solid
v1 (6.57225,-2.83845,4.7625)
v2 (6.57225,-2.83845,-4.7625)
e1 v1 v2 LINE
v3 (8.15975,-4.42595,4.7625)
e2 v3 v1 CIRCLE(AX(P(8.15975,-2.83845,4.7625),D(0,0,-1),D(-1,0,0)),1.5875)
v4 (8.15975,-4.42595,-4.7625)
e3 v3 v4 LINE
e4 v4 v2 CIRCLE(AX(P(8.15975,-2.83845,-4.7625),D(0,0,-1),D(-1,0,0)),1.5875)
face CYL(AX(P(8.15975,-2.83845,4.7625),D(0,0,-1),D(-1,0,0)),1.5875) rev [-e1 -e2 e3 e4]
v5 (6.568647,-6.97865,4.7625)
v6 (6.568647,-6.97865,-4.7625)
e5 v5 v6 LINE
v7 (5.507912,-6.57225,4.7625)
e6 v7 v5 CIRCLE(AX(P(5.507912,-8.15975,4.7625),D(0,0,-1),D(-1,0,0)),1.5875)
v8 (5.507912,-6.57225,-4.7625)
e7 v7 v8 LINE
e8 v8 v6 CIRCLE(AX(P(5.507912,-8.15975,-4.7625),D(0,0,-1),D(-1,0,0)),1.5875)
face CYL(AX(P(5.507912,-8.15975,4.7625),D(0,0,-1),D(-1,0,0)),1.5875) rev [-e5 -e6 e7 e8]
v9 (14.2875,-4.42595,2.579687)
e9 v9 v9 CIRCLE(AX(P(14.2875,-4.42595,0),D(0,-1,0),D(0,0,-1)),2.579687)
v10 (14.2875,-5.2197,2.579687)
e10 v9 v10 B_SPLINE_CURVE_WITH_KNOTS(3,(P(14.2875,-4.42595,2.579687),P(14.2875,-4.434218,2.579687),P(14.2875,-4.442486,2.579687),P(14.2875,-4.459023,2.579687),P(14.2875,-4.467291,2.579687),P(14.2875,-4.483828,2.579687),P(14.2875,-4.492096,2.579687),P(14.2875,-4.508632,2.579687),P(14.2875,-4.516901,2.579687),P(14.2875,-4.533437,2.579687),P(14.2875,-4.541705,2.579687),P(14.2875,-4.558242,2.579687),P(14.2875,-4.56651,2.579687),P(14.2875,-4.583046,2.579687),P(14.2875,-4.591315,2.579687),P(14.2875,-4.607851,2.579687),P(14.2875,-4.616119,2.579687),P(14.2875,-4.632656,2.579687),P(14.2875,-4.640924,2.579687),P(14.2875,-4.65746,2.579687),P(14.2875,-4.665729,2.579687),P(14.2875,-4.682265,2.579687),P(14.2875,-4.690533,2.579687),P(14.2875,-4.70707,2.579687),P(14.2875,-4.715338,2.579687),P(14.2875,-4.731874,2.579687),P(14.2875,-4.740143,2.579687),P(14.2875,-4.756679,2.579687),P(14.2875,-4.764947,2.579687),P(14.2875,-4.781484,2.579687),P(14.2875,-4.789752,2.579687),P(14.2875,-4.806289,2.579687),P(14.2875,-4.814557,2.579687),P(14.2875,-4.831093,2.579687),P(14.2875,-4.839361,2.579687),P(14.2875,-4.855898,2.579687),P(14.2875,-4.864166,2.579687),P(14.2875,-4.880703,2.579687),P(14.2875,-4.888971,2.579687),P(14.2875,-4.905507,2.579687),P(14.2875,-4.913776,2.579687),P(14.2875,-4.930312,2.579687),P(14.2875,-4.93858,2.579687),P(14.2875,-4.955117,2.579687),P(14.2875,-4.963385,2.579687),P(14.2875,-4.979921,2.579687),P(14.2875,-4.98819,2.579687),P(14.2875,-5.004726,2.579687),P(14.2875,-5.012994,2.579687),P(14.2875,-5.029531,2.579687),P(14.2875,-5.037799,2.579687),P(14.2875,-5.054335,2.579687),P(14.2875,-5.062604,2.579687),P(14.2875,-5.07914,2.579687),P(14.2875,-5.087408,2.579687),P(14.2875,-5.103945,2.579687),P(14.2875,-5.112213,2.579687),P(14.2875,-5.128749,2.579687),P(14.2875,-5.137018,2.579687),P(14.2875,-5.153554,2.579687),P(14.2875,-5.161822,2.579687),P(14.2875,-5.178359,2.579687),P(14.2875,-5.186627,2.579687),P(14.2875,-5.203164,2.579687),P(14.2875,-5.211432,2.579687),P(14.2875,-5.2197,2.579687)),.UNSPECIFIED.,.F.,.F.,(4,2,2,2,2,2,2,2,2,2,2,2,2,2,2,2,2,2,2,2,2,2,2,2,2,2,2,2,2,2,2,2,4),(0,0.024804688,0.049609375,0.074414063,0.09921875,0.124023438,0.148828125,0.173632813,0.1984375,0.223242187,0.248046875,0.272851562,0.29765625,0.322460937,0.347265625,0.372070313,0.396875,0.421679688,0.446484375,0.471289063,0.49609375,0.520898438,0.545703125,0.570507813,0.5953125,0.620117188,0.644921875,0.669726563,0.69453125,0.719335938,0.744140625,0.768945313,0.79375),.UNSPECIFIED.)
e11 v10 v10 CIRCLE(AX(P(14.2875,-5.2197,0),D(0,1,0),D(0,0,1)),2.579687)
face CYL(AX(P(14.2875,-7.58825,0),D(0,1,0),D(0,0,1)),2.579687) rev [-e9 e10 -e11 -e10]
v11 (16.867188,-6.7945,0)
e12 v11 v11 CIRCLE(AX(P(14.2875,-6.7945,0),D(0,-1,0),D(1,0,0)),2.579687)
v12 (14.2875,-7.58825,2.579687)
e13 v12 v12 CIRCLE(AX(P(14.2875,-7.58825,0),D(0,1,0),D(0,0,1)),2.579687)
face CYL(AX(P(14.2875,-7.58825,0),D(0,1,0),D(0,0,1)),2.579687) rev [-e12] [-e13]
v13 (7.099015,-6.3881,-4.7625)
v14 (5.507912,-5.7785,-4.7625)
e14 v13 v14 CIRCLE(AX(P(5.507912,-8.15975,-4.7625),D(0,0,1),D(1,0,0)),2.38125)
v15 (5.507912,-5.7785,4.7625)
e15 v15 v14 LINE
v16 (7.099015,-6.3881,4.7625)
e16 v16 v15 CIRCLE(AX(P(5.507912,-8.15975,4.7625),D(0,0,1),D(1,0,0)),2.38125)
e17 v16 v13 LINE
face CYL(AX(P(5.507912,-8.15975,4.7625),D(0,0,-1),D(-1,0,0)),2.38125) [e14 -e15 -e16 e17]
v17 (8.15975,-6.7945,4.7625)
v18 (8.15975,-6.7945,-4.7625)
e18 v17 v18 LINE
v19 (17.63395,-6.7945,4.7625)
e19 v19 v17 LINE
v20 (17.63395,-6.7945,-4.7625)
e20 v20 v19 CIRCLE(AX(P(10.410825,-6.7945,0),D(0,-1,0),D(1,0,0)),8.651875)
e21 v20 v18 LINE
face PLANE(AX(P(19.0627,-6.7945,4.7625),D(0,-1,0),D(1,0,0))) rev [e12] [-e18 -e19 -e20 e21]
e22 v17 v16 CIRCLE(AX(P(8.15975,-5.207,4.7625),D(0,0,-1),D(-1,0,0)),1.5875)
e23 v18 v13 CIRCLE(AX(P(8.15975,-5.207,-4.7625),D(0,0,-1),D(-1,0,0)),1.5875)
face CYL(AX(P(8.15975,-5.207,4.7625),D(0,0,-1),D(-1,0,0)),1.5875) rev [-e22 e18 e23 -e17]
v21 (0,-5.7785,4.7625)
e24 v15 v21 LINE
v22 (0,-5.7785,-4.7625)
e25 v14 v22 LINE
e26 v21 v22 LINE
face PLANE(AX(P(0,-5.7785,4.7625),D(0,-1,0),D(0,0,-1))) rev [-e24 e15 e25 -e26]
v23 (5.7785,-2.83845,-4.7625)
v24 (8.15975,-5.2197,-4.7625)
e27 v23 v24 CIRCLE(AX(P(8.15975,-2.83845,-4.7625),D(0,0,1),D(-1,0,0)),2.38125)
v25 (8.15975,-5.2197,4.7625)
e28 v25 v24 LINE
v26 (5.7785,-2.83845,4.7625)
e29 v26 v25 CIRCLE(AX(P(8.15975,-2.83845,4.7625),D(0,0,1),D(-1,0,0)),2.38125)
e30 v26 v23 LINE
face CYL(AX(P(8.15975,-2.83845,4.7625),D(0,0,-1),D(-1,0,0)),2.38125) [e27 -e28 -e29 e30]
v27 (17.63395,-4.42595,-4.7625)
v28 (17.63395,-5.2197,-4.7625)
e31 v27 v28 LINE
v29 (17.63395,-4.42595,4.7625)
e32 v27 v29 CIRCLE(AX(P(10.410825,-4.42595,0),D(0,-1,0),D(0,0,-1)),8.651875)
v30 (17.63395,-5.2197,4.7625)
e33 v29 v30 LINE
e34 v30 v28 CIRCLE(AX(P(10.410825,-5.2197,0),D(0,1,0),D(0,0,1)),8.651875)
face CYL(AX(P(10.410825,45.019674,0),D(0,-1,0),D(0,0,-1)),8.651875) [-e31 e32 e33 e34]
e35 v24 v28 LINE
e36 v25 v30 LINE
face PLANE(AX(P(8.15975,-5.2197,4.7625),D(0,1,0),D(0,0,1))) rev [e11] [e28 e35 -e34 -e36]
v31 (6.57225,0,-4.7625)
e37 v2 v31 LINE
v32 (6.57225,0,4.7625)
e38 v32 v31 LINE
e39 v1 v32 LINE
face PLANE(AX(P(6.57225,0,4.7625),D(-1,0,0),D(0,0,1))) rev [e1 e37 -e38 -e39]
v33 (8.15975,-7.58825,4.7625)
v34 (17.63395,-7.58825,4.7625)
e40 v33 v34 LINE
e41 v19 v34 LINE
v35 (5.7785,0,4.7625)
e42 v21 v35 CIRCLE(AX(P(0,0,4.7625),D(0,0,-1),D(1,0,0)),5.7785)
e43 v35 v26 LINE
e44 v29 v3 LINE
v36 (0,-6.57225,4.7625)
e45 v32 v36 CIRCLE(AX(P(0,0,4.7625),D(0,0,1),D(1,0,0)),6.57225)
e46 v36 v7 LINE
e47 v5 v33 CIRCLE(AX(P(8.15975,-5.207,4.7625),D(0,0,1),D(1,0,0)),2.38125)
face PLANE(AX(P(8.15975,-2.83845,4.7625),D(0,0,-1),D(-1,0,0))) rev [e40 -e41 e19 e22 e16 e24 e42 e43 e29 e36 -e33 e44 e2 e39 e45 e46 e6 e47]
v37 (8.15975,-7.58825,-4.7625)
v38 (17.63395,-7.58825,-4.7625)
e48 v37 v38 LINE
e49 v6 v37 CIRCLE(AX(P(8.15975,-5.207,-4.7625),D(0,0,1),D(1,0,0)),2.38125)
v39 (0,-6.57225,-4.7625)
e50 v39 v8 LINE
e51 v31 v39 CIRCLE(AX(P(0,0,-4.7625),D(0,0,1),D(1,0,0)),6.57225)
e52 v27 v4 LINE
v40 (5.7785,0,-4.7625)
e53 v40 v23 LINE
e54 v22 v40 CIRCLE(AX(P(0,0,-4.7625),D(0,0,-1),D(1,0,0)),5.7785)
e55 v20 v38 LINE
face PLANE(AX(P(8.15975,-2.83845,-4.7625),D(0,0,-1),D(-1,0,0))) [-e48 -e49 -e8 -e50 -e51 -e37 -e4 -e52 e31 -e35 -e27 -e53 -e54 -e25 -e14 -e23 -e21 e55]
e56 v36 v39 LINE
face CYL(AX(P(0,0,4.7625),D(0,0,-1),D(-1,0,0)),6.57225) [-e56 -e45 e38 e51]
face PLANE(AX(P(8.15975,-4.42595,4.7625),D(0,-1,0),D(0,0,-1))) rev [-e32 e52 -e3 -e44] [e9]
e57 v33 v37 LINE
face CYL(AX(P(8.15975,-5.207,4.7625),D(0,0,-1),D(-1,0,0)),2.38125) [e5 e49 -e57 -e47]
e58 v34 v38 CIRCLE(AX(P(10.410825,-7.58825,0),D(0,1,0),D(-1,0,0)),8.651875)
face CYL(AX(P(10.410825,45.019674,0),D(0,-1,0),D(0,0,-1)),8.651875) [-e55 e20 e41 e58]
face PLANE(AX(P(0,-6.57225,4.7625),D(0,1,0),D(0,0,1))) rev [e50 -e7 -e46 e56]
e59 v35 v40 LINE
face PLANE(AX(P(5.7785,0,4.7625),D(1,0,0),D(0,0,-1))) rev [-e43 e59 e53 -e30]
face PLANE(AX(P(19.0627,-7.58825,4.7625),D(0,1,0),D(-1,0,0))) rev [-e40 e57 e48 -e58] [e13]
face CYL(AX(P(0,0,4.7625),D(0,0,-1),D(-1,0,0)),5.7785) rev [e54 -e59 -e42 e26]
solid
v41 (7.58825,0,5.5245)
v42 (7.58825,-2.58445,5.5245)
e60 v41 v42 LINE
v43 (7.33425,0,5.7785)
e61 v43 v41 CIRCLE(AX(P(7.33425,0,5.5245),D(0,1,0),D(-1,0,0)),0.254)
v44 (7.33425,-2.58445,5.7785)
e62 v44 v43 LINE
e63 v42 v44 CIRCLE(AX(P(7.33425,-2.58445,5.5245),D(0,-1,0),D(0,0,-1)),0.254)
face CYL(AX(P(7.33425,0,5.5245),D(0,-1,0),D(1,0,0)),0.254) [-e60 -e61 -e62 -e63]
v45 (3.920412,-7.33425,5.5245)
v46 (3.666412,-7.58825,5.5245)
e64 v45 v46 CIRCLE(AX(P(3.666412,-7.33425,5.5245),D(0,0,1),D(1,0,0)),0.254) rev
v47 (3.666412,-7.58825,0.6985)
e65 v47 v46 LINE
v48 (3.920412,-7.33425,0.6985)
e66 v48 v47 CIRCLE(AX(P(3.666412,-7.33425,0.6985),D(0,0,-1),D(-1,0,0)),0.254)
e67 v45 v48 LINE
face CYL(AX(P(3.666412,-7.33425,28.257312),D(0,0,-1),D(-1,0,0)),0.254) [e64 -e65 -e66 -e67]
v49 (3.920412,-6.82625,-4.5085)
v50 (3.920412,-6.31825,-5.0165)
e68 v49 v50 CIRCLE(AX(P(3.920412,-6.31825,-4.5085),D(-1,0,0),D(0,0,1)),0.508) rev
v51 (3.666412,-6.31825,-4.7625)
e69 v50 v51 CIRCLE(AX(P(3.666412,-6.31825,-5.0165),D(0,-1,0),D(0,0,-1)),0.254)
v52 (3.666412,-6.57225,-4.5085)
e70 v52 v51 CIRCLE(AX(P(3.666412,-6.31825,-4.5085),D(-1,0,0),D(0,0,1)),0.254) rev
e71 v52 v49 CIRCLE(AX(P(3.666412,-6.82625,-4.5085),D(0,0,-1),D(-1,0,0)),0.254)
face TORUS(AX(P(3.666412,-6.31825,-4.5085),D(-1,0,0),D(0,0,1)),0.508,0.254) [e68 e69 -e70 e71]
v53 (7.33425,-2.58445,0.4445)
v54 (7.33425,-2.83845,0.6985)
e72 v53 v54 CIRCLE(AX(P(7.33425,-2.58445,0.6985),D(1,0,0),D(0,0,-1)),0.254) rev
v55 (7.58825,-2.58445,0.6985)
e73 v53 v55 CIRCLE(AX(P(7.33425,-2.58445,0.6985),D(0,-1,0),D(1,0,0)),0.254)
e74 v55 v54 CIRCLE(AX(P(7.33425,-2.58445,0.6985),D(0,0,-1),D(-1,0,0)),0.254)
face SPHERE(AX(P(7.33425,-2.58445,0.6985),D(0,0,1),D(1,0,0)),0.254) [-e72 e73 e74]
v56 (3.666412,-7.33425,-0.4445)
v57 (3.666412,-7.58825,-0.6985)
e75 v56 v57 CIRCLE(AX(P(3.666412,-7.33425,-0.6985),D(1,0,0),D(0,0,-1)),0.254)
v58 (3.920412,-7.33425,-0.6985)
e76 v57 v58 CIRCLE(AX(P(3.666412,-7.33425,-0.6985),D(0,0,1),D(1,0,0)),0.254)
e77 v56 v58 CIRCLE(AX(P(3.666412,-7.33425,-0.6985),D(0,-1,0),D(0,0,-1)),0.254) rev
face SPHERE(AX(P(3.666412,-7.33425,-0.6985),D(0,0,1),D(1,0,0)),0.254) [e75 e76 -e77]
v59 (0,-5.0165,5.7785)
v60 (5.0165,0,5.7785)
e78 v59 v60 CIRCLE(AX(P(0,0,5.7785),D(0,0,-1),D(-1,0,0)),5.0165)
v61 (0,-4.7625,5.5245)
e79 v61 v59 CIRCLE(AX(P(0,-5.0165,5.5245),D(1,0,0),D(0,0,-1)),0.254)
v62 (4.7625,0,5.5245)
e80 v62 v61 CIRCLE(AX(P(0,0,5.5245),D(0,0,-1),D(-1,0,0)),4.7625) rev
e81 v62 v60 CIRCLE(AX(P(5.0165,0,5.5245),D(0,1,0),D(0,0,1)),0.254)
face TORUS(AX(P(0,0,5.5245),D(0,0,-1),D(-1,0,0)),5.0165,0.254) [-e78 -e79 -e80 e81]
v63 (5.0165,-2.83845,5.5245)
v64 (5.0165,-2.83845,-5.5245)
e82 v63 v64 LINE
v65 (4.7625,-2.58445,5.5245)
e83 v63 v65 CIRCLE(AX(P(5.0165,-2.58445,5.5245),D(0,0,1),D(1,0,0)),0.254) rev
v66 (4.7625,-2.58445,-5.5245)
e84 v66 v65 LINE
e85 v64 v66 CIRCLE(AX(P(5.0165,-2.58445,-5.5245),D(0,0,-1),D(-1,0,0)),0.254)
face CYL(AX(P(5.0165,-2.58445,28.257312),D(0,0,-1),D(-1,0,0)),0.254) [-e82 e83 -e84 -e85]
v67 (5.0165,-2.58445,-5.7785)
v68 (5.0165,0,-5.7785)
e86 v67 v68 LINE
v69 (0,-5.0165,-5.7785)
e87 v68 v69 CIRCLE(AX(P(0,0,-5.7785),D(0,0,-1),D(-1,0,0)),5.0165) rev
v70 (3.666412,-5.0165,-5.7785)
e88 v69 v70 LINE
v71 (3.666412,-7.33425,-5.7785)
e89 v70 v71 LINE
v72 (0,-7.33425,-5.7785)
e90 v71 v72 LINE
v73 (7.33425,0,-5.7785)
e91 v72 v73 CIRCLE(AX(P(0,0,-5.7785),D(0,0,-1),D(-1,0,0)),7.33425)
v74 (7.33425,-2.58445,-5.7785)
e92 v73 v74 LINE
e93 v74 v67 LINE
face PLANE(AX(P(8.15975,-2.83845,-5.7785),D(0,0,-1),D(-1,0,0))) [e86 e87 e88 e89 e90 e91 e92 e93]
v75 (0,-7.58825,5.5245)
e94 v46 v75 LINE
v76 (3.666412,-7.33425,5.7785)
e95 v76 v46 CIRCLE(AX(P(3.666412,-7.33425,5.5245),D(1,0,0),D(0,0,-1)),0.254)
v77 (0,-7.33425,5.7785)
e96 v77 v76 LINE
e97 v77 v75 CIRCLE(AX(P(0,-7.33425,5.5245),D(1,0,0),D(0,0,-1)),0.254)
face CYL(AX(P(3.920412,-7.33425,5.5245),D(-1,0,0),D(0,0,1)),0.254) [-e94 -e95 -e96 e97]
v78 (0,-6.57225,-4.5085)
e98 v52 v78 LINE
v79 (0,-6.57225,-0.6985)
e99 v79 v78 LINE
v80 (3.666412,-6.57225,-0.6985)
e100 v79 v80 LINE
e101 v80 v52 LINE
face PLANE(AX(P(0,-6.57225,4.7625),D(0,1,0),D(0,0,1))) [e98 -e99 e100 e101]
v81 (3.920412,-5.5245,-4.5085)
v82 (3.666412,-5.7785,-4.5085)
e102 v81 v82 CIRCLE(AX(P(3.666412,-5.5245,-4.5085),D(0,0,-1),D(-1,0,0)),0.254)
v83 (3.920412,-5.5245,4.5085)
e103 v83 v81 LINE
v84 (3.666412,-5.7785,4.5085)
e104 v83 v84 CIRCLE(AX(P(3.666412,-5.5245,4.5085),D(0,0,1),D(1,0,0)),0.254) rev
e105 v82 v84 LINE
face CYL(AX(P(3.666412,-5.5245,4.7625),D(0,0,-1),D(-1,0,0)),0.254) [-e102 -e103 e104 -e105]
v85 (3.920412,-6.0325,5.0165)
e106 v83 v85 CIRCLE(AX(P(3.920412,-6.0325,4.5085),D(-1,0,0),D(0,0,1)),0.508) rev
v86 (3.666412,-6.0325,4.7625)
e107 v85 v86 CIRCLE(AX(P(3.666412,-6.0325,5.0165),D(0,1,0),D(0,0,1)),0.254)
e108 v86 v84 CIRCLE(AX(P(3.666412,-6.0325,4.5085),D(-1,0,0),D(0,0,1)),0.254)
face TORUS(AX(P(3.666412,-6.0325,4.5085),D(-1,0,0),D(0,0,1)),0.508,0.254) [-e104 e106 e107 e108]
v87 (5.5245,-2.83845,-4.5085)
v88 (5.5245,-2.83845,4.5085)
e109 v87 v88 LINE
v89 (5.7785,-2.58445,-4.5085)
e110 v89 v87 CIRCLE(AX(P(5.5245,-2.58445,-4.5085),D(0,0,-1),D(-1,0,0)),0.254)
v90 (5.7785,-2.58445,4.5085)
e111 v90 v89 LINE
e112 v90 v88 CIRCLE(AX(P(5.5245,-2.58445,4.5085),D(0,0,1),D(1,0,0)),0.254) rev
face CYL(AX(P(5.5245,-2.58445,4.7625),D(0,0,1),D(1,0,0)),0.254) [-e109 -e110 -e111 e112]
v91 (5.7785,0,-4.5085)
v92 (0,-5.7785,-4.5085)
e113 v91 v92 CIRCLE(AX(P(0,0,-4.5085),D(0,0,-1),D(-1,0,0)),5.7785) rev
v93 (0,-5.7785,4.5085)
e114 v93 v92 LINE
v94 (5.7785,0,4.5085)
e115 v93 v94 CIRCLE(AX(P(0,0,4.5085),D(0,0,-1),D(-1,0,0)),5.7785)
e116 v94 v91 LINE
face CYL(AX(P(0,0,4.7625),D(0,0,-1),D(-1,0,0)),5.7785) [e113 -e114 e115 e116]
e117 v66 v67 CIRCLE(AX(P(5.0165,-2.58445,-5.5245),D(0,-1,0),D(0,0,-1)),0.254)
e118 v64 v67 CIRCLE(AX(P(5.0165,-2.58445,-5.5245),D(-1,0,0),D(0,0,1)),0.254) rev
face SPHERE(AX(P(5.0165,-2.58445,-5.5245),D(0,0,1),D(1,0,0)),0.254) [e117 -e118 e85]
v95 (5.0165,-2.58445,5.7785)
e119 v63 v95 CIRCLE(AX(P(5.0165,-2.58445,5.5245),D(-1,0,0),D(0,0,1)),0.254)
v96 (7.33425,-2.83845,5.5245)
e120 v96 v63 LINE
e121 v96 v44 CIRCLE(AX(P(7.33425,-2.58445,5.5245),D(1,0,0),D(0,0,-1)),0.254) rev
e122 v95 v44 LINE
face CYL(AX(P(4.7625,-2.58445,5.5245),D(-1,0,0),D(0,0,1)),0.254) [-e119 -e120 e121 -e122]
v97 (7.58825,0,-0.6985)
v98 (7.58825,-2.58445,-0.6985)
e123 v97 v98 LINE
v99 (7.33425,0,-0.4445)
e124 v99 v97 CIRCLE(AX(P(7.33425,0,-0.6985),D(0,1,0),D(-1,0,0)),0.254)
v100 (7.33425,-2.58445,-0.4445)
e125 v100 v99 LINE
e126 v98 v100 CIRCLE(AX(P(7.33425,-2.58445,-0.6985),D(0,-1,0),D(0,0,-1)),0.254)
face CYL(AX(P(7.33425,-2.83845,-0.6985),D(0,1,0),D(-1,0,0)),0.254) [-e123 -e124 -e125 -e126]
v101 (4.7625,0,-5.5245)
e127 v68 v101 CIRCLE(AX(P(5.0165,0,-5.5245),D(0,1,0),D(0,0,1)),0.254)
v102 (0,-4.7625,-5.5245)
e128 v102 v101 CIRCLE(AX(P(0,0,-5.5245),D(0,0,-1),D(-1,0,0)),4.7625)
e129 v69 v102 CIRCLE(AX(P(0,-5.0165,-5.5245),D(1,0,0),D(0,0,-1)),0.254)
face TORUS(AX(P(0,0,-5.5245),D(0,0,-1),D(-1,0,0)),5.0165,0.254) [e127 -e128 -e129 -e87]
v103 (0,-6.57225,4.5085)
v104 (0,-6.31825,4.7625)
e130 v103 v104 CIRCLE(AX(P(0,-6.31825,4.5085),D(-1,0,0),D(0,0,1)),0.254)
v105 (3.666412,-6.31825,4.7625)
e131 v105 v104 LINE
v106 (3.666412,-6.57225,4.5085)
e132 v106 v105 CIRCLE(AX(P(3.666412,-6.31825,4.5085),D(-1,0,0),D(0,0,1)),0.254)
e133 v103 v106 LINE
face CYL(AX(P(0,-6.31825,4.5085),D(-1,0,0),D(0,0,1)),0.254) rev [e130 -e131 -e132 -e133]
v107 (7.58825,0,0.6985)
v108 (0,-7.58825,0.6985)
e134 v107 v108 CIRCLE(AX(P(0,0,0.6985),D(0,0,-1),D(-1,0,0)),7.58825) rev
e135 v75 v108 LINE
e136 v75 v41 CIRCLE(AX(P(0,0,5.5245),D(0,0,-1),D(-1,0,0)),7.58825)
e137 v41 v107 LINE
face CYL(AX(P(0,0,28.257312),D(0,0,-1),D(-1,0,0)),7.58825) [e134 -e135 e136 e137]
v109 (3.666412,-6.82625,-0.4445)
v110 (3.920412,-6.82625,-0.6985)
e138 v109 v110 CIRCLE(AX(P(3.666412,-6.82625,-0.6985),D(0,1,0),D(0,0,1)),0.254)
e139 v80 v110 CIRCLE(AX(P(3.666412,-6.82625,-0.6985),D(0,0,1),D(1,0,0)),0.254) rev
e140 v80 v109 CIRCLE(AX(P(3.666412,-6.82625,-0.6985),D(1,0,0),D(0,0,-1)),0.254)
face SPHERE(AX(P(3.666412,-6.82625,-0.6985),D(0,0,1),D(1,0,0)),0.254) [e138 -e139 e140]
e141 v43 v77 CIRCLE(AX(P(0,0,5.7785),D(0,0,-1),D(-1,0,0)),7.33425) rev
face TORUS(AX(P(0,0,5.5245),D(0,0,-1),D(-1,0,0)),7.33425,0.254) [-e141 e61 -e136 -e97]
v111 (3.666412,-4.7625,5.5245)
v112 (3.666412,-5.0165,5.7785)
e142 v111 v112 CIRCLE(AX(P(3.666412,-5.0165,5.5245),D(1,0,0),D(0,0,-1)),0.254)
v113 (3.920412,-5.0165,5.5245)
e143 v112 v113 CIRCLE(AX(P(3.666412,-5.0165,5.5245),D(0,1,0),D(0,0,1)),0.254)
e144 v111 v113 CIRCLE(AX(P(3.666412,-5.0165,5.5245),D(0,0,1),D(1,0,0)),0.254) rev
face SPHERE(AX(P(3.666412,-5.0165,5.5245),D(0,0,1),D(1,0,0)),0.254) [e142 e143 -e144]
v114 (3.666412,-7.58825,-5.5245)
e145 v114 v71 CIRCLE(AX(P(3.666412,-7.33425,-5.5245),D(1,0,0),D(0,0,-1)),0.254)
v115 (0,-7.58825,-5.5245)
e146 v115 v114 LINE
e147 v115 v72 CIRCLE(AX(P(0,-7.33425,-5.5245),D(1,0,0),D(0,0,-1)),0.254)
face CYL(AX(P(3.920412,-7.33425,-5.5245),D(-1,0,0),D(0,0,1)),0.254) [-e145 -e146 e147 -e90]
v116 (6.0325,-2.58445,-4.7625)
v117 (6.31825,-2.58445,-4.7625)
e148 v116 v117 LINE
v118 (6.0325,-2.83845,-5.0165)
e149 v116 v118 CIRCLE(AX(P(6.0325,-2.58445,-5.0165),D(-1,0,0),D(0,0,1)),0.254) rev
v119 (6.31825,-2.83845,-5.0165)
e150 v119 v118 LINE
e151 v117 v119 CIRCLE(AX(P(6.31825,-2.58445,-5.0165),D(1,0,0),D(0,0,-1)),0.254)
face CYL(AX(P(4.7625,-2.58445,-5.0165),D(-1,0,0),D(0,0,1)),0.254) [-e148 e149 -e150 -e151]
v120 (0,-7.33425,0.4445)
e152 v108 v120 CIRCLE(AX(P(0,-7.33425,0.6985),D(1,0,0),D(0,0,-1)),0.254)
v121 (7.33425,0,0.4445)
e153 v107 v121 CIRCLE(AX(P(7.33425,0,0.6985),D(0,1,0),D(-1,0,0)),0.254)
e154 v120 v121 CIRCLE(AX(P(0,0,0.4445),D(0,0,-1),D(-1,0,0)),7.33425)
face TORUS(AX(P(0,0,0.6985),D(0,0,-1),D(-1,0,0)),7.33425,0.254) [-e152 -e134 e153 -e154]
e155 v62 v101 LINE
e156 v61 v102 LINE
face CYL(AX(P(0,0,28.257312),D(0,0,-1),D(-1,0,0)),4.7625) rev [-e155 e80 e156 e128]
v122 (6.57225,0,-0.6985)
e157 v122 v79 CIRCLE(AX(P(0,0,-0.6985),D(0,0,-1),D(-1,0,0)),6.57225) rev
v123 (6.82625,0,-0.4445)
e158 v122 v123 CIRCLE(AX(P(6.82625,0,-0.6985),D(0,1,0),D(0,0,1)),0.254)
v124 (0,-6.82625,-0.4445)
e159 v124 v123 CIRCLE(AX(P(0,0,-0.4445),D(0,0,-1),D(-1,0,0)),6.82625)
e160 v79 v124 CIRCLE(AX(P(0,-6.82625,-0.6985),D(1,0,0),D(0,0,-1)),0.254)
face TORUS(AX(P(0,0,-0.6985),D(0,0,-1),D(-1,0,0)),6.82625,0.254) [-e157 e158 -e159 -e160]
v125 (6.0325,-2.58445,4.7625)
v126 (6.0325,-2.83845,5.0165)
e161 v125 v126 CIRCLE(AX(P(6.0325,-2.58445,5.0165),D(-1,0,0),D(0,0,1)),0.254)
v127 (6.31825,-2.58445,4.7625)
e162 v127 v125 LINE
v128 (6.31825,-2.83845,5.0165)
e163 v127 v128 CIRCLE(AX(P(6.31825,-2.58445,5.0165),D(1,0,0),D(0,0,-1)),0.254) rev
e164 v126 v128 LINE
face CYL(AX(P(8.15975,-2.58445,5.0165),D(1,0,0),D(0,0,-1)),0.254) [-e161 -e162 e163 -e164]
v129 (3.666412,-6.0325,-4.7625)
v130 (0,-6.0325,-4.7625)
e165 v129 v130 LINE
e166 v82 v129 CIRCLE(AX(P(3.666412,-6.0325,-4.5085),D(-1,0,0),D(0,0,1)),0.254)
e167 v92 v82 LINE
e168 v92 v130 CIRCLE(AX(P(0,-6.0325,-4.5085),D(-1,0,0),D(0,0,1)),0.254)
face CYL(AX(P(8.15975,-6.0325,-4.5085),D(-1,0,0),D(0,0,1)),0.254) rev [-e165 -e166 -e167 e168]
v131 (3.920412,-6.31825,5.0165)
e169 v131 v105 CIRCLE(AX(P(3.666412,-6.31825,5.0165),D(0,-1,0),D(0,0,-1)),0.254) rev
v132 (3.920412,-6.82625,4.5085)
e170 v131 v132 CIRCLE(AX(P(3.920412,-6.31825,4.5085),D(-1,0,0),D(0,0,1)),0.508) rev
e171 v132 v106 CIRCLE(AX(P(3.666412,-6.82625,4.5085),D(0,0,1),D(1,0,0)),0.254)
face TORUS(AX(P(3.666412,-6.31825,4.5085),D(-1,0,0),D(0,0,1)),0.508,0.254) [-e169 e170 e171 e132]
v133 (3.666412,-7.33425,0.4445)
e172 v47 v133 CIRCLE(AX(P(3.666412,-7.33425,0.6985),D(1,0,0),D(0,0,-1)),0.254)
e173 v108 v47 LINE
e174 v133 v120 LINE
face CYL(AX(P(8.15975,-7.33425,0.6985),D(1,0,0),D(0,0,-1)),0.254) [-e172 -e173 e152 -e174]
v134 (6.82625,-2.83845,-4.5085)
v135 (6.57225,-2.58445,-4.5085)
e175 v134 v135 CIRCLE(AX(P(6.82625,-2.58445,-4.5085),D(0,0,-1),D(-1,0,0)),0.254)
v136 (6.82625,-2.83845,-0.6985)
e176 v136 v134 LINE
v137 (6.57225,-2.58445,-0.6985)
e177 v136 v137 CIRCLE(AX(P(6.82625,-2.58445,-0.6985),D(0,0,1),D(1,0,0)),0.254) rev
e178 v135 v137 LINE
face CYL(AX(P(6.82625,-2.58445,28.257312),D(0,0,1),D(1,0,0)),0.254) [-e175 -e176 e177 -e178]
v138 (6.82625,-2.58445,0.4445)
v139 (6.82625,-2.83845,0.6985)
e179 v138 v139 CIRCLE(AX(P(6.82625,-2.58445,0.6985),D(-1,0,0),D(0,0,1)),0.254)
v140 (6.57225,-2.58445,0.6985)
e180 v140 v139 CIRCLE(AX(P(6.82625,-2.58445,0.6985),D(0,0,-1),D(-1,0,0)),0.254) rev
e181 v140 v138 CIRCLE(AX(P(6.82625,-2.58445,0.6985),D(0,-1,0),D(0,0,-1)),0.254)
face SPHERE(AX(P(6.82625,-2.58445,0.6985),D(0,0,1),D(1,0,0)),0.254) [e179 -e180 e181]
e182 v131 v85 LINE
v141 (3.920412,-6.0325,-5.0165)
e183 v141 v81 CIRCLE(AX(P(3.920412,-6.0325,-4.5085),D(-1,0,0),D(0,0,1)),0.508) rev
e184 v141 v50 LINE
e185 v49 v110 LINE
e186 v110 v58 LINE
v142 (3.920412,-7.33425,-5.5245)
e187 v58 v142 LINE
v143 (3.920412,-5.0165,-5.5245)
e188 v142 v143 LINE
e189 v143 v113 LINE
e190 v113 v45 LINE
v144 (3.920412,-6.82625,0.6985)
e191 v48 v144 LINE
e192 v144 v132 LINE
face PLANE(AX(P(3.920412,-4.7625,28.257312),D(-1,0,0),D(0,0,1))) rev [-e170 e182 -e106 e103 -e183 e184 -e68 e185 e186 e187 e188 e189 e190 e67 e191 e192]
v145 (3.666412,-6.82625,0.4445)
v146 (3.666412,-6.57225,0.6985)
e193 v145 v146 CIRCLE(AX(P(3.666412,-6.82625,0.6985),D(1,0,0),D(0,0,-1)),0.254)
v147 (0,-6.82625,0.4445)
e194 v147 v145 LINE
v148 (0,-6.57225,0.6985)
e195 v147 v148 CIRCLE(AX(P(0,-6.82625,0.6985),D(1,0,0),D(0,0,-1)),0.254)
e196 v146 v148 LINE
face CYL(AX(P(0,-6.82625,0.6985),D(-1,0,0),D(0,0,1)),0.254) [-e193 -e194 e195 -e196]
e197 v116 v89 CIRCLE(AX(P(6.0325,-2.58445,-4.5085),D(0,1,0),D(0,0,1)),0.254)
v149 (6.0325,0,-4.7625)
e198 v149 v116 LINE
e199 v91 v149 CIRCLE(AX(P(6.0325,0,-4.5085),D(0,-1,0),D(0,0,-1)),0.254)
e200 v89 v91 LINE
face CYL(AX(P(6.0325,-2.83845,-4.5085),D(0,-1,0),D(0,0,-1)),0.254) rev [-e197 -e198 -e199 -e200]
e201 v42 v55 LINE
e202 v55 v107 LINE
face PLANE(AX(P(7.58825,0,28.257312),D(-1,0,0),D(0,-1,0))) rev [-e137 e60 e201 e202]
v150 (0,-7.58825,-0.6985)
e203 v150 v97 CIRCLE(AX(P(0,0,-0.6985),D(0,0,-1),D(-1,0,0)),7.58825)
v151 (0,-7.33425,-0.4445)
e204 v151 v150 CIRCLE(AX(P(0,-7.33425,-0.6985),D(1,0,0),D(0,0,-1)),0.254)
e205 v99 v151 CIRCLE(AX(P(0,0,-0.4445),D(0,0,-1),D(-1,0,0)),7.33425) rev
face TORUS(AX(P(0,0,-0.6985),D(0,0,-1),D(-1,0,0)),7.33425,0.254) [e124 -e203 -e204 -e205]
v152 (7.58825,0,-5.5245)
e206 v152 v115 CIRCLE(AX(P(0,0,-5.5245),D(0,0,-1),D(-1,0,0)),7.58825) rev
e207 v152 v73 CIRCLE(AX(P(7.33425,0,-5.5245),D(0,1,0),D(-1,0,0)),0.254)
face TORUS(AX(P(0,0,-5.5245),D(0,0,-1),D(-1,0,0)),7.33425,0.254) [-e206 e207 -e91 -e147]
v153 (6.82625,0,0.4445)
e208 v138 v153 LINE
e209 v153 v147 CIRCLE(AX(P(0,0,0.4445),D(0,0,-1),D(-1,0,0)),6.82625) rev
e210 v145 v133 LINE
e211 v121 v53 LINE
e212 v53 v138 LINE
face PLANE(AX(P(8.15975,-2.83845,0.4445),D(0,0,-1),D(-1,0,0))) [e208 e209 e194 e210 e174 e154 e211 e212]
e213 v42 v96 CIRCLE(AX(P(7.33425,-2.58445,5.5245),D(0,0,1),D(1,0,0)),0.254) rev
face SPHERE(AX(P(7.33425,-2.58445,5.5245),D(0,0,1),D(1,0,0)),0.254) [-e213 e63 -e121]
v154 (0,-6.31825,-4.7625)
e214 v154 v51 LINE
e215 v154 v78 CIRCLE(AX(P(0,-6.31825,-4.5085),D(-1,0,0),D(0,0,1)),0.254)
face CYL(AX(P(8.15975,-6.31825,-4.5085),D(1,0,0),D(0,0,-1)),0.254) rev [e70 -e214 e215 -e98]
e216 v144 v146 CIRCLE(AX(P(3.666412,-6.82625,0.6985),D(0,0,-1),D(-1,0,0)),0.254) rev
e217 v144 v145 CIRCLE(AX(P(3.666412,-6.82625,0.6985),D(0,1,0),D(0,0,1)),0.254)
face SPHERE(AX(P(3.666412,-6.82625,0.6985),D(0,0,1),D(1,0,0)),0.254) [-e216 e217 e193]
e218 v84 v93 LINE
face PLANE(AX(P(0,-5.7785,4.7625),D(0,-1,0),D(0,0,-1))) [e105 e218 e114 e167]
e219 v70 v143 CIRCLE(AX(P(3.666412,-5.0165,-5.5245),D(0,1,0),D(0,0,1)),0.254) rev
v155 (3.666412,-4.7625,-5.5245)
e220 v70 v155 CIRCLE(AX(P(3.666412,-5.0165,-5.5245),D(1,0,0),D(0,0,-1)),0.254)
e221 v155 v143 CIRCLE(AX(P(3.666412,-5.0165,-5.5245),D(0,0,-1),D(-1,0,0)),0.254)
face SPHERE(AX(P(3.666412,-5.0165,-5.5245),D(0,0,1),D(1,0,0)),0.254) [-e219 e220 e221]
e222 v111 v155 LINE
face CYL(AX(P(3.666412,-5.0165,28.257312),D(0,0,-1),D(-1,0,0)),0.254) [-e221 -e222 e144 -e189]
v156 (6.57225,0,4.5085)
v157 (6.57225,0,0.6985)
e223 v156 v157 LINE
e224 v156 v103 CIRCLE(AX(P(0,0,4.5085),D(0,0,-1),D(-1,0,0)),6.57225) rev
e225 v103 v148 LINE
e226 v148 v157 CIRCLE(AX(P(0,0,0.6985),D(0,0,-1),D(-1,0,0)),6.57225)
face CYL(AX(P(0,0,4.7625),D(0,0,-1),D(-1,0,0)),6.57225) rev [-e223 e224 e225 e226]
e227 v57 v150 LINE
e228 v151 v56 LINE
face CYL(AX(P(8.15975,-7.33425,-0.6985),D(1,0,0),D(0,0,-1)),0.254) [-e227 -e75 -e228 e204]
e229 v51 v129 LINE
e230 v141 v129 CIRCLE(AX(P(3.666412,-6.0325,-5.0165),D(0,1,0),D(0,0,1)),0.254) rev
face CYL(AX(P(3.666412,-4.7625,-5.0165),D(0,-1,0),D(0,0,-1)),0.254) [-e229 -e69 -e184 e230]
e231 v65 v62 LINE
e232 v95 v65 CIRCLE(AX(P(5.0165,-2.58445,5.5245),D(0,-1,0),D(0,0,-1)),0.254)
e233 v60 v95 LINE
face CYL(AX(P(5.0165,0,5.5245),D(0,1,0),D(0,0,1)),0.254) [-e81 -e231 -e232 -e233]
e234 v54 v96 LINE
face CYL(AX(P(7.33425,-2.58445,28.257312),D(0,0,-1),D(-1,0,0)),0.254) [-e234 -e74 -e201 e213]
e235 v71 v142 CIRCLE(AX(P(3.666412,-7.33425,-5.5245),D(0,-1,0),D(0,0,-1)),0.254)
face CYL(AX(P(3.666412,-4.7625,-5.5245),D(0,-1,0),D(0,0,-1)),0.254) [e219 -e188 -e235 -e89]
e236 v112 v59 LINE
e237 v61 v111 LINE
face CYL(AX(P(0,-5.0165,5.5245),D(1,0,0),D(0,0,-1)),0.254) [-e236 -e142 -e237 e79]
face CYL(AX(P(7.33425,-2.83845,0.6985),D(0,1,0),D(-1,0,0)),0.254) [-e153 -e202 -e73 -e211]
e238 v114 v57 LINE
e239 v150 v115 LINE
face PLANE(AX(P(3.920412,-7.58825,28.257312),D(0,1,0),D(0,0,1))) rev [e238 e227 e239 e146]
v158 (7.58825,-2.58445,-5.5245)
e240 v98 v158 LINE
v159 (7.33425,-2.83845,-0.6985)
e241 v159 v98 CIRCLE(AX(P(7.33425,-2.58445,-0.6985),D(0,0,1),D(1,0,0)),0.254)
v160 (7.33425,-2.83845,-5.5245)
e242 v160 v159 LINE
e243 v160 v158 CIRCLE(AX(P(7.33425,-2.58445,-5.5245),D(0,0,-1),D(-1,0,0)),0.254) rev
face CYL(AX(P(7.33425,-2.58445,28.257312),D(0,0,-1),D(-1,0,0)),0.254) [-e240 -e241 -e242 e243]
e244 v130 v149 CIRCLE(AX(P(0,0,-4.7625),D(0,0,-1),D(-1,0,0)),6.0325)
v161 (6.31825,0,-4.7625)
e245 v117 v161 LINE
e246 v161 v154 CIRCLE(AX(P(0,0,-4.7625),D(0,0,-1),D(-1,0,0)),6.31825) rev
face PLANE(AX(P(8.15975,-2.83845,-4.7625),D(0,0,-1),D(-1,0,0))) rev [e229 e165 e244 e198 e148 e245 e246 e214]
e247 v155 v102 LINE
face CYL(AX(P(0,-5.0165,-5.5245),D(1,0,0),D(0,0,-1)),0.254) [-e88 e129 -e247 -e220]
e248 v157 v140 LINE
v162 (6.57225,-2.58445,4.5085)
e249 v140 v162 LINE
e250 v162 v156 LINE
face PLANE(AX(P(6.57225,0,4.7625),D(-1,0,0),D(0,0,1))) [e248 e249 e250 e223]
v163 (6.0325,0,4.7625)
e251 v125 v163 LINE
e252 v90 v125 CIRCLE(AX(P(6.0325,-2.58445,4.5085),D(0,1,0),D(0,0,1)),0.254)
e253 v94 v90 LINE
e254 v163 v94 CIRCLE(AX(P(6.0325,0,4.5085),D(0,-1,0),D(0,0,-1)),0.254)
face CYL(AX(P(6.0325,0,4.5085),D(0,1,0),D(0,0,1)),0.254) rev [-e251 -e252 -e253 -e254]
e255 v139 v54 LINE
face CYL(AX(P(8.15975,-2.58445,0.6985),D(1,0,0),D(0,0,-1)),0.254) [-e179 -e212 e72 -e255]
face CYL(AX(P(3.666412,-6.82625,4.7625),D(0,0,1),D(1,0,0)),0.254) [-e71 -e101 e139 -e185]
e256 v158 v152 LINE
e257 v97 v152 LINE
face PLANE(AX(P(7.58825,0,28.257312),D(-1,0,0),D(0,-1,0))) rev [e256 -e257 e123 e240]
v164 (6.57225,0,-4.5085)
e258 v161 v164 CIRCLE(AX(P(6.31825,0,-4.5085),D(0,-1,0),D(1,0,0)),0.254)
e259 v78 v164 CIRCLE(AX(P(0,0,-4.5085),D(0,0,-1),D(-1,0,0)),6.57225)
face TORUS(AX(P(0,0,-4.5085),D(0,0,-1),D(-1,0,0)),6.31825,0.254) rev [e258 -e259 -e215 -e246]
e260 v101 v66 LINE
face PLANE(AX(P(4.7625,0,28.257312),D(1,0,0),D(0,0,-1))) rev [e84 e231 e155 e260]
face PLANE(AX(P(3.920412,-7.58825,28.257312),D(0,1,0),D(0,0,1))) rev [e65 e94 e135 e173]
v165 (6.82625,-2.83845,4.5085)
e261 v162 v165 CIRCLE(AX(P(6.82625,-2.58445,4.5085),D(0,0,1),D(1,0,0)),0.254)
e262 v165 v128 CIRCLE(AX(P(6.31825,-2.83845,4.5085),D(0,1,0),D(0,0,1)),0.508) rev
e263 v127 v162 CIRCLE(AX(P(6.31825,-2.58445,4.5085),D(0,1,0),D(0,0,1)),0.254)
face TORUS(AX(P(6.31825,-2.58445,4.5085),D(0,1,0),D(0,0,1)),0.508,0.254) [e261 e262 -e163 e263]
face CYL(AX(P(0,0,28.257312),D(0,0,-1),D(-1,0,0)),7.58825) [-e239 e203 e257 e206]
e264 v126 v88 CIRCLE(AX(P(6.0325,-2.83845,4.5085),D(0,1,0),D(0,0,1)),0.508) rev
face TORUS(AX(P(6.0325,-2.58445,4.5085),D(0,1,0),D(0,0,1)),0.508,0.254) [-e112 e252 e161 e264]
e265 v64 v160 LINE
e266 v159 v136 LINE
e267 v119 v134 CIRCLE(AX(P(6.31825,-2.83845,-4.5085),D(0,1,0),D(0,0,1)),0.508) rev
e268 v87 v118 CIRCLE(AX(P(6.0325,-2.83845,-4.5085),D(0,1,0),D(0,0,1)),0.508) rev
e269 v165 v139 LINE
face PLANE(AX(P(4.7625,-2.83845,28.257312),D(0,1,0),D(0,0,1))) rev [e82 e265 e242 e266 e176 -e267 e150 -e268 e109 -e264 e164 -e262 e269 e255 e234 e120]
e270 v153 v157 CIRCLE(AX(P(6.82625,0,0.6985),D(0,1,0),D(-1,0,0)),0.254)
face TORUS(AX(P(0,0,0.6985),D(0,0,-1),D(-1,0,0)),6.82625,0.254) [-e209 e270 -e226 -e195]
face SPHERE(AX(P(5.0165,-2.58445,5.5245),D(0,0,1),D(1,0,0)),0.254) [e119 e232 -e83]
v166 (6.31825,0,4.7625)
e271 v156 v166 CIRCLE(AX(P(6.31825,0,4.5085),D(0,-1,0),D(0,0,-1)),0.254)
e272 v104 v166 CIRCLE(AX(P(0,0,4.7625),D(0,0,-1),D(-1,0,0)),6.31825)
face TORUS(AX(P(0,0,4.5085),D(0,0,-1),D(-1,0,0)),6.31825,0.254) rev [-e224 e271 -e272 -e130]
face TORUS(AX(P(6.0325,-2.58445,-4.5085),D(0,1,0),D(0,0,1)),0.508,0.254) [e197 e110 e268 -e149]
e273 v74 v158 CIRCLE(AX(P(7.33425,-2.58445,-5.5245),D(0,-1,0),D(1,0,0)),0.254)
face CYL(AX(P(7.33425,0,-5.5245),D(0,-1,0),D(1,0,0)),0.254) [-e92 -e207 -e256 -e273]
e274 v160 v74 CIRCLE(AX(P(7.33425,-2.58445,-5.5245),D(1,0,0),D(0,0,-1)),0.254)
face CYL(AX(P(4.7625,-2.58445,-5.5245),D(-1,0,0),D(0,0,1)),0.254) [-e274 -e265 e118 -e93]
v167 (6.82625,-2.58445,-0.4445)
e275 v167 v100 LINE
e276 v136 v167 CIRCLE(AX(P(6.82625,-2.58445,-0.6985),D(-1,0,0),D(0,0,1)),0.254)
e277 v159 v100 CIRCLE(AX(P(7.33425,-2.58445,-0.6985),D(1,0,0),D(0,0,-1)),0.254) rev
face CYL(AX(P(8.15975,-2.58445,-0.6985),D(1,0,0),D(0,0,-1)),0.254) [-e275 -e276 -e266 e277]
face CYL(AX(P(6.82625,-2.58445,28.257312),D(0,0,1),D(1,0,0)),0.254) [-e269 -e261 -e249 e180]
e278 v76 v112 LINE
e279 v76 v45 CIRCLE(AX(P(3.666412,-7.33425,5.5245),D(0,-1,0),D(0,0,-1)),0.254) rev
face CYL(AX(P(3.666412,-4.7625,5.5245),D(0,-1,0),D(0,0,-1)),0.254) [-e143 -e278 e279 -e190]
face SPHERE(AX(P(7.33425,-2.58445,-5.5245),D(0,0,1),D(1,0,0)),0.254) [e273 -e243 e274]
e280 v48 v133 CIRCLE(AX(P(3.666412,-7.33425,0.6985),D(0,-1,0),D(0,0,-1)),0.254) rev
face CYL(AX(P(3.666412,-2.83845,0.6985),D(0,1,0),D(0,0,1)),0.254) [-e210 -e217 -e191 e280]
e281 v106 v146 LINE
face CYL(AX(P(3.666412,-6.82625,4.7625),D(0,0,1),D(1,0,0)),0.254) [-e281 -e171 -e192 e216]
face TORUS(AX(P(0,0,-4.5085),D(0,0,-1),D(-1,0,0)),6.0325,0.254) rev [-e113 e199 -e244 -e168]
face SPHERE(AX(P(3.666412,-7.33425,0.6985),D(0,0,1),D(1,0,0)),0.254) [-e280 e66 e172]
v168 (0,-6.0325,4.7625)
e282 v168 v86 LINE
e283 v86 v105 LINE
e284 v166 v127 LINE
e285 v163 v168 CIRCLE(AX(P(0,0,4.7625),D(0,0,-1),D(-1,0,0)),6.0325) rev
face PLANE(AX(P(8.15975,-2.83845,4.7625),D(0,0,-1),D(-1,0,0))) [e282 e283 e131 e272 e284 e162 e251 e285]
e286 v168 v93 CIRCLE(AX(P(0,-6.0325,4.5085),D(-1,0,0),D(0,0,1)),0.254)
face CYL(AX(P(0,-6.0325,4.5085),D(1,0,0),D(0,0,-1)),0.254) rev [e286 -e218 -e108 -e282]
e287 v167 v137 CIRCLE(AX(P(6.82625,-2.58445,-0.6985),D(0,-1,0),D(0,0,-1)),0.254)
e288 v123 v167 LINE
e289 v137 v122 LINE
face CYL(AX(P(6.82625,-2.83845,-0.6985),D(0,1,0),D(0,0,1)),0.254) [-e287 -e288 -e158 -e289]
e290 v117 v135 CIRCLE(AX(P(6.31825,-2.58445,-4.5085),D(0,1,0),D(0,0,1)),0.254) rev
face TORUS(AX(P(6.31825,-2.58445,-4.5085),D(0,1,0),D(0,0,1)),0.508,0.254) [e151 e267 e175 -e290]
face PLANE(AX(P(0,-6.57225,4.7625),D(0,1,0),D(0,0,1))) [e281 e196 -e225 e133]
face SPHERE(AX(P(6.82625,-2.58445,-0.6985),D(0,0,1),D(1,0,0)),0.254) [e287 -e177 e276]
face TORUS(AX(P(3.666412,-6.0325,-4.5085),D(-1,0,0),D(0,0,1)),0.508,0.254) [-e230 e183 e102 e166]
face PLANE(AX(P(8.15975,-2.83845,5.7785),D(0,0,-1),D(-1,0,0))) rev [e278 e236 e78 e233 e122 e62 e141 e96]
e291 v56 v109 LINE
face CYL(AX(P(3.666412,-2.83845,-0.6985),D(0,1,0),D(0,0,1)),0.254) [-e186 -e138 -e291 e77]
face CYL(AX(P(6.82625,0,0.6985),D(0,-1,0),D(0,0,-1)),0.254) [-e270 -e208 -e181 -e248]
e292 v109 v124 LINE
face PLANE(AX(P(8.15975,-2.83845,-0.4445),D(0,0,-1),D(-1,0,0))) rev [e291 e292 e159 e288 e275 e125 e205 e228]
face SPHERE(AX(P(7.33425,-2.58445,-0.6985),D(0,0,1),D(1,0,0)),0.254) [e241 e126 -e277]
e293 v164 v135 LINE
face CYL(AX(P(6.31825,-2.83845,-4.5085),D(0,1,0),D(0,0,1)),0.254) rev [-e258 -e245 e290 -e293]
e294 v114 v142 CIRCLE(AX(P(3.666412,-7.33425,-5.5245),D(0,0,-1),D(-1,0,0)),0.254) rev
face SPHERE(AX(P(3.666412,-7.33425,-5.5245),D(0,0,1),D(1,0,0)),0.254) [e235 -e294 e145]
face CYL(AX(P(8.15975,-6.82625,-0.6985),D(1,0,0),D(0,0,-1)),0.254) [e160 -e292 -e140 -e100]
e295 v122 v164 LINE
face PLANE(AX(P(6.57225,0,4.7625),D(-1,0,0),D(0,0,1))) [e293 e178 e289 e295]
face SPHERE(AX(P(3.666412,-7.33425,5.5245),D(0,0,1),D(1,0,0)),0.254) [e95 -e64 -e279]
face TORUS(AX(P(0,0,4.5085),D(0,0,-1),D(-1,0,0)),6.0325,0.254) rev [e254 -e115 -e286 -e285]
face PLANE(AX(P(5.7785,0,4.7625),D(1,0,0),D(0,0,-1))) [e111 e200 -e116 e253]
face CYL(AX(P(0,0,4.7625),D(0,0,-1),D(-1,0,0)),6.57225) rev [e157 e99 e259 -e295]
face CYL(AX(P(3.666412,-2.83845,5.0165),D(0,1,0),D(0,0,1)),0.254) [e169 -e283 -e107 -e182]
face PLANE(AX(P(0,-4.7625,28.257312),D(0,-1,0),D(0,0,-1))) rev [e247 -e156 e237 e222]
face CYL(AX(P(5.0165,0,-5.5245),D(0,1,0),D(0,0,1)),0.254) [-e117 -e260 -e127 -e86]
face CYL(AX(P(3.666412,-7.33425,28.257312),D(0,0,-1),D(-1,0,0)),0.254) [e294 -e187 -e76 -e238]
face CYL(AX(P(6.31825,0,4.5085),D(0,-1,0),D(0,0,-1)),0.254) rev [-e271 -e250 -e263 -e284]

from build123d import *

# Parameters (mm, degrees)
BOSS_EXTRUDE1_DEPTH         = 4.7625
SKETCH2_R                   = 2.5796875
CUT_EXTRUDE1_DEPTH          = 22.062988288
CUT_EXTRUDE3_DEPTH          = 22.062988288
CUT_EXTRUDE3_DEPTH_BACK     = 22.062988288
BOSS_EXTRUDE2_DEPTH         = 5.7785
BOSS_EXTRUDE2_DEPTH_BACK    = 5.7785
BODY_MOVE_COPY1_START       = -2.83845
BODY_MOVE_COPY1_OUTLINE_W   = 0.79375
BODY_MOVE_COPY1_OUTLINE_H   = 9.525
BODY_MOVE_COPY1_DEPTH       = 2.83845
BODY_MOVE_COPY1_START_2     = -6.97865
BODY_MOVE_COPY1_2_OUTLINE_R = 2.5796875
BODY_MOVE_COPY1_2_DEPTH     = 0.18415
BODY_MOVE_COPY1_START_3     = -6.57225
BODY_MOVE_COPY1_3_OUTLINE_W = 0.79375
BODY_MOVE_COPY1_3_OUTLINE_H = 9.525
BODY_MOVE_COPY1_3_DEPTH     = 0.18415
BODY_MOVE_COPY1_START_4     = -5.2197
BODY_MOVE_COPY1_4_OUTLINE_R = 2.5796875
BODY_MOVE_COPY1_4_DEPTH     = 2.38125
BODY_MOVE_COPY1_START_5     = -7.58825
BODY_MOVE_COPY1_5_OUTLINE_R = 2.5796875
BODY_MOVE_COPY1_5_DEPTH     = 1.80975
BODY_MOVE_COPY1_6_OUTLINE_W = 0.79375
BODY_MOVE_COPY1_6_OUTLINE_H = 9.525
BODY_MOVE_COPY1_6_DEPTH     = 5.7785
BODY_MOVE_COPY1_START_6     = -7.028164125
BODY_MOVE_COPY1_7_OUTLINE_W = 0.79375
BODY_MOVE_COPY1_7_OUTLINE_H = 9.525
BODY_MOVE_COPY1_7_DEPTH     = 1.249664125
BODY_MOVE_COPY1_START_7     = -4.7625
BODY_MOVE_COPY1_8_DEPTH     = 9.525
BODY_MOVE_COPY1_9_DEPTH     = 9.525
CUT_EXTRUDE4_DEPTH          = 0.4445
CUT_EXTRUDE4_DEPTH_BACK     = 0.4445
FILLET1_R                   = 0.254


with BuildPart() as part:
    # Sketch1 → Boss-Extrude1 (new, symmetric)
    with BuildSketch(Plane.XY):
        with BuildLine():
            Line((0, -5.7785), (5.507912147, -5.7785))
            ThreePointArc((5.507912147, -5.7785), (6.359854046, -5.936116361), (7.099014859, -6.3881))
            ThreePointArc((7.099014859, -6.3881), (7.591788734, -6.689422426), (8.15975, -6.7945))
            Line((8.15975, -6.7945), (19.0627, -6.7945))
            Line((19.0627, -6.7945), (19.0627, -7.58825))
            Line((19.0627, -7.58825), (8.15975, -7.58825))
            ThreePointArc((8.15975, -7.58825), (7.307808101, -7.430633639), (6.568647288, -6.97865))
            ThreePointArc((6.568647288, -6.97865), (6.075873413, -6.677327574), (5.507912147, -6.57225))
            Line((5.507912147, -6.57225), (0, -6.57225))
            ThreePointArc((0, -6.57225), (-4.647282543, 4.647282543), (6.57225, 0))
            Line((6.57225, 0), (6.57225, -2.83845))
            ThreePointArc((6.57225, -2.83845), (7.037217985, -3.960982015), (8.15975, -4.42595))
            Line((8.15975, -4.42595), (19.0627, -4.42595))
            Line((19.0627, -4.42595), (19.0627, -5.2197))
            Line((19.0627, -5.2197), (8.15975, -5.2197))
            ThreePointArc((8.15975, -5.2197), (6.475951977, -4.522248023), (5.7785, -2.83845))
            Line((5.7785, -2.83845), (5.7785, 0))
            ThreePointArc((5.7785, 0), (-4.086016535, 4.086016535), (0, -5.7785))
        make_face()
    extrude(amount=BOSS_EXTRUDE1_DEPTH, both=True)

    # Sketch2 → Cut-Extrude1 (cut, through all)
    with BuildSketch(Plane(origin=(0, 0, 0), x_dir=(1, 0, 0), z_dir=(0, 1, 0))):
        with Locations(Location((14.2875, 0, 0), (0, 0, 270))):
            Circle(SKETCH2_R)
    extrude(amount=-CUT_EXTRUDE1_DEPTH, mode=Mode.SUBTRACT)

    # Sketch4 → Cut-Extrude3 (cut, two sides: drawn at the far end of the back side and taken through both)
    with BuildSketch(Plane(origin=(0, 0, 0), x_dir=(1, 0, 0), z_dir=(0, 1, 0)).offset(-CUT_EXTRUDE3_DEPTH_BACK)):
        with BuildLine():
            Line((-16.508581678, 56.545339712), (17.63395, 4.7625))
            ThreePointArc((17.63395, 4.7625), (19.0627, 0), (17.63395, -4.7625))
            Line((17.63395, -4.7625), (-16.508581678, -56.545339712))
            Line((-16.508581678, -56.545339712), (107.542616753, -56.545339712))
            Line((107.542616753, -56.545339712), (107.542616753, 56.545339712))
            Line((107.542616753, 56.545339712), (-16.508581678, 56.545339712))
        make_face()
    extrude(amount=CUT_EXTRUDE3_DEPTH + CUT_EXTRUDE3_DEPTH_BACK, mode=Mode.SUBTRACT)


with BuildPart() as body_2:
    # Sketch5 → Boss-Extrude2 (new, two sides: drawn at the far end of the back side and taken through both)
    with BuildSketch(Plane.XY.offset(-BOSS_EXTRUDE2_DEPTH_BACK)):
        with BuildLine():
            Line((4.7625, 0), (4.7625, -2.83845))
            Line((4.7625, -2.83845), (7.58825, -2.83845))
            Line((7.58825, -2.83845), (7.58825, 0))
            ThreePointArc((7.58825, 0), (-5.365703032, 5.365703032), (0, -7.58825))
            Line((0, -7.58825), (3.920412147, -7.58825))
            Line((3.920412147, -7.58825), (3.920412147, -4.7625))
            Line((3.920412147, -4.7625), (0, -4.7625))
            ThreePointArc((0, -4.7625), (-3.367596045, 3.367596045), (4.7625, 0))
        make_face()
    extrude(amount=BOSS_EXTRUDE2_DEPTH + BOSS_EXTRUDE2_DEPTH_BACK)


with BuildPart() as body_3:
    # Body-Move/Copy1: read off the stored shape, not the designer's step
    # Body-Move/Copy1 outline → Body-Move/Copy1 (new body)
    with BuildSketch(Plane(origin=(0, 0, 0), x_dir=(1, 0, 0), z_dir=(0, 1, 0)).offset(BODY_MOVE_COPY1_START)):
        with Locations((6.175375, 0)):
            Rectangle(BODY_MOVE_COPY1_OUTLINE_W, BODY_MOVE_COPY1_OUTLINE_H)
    extrude(amount=BODY_MOVE_COPY1_DEPTH)

    # Body-Move_Copy1 2 outline → Body-Move_Copy1 2 (add)
    with BuildSketch(Plane(origin=(0, 0, 0), x_dir=(1, 0, 0), z_dir=(0, 1, 0)).offset(BODY_MOVE_COPY1_START_2)):
        with BuildLine():
            Line((6.57225, -4.7625), (17.63395, -4.7625))
            ThreePointArc((17.63395, -4.7625), (19.0627, 0), (17.63395, 4.7625))
            Line((17.63395, 4.7625), (6.57225, 4.7625))
            Line((6.57225, 4.7625), (6.57225, -4.7625))
        make_face()
        with Locations((14.2875, 0)):
            Circle(BODY_MOVE_COPY1_2_OUTLINE_R, mode=Mode.SUBTRACT)
    extrude(amount=BODY_MOVE_COPY1_2_DEPTH)

    # Body-Move_Copy1 3 outline → Body-Move_Copy1 3 (add)
    with BuildSketch(Plane(origin=(0, 0, 0), x_dir=(1, 0, 0), z_dir=(0, 1, 0)).offset(BODY_MOVE_COPY1_START_3)):
        with Locations((6.175375, 0)):
            Rectangle(BODY_MOVE_COPY1_3_OUTLINE_W, BODY_MOVE_COPY1_3_OUTLINE_H)
    extrude(amount=BODY_MOVE_COPY1_3_DEPTH)

    # Body-Move_Copy1 4 outline → Body-Move_Copy1 4 (add)
    with BuildSketch(Plane(origin=(0, 0, 0), x_dir=(1, 0, 0), z_dir=(0, 1, 0)).offset(BODY_MOVE_COPY1_START_4)):
        with BuildLine():
            ThreePointArc((17.63395, -4.7625), (19.0627, 0), (17.63395, 4.7625))
            Line((17.63395, 4.7625), (5.7785, 4.7625))
            Line((5.7785, 4.7625), (5.7785, -4.7625))
            Line((5.7785, -4.7625), (17.63395, -4.7625))
        make_face()
        with Locations((14.2875, 0)):
            Circle(BODY_MOVE_COPY1_4_OUTLINE_R, mode=Mode.SUBTRACT)
    extrude(amount=BODY_MOVE_COPY1_4_DEPTH)

    # Body-Move_Copy1 5 outline → Body-Move_Copy1 5 (add)
    with BuildSketch(Plane(origin=(0, 0, 0), x_dir=(1, 0, 0), z_dir=(0, 1, 0)).offset(BODY_MOVE_COPY1_START_5)):
        with BuildLine():
            Line((6.57225, -4.7625), (17.63395, -4.7625))
            ThreePointArc((17.63395, -4.7625), (19.0627, 0), (17.63395, 4.7625))
            Line((17.63395, 4.7625), (6.57225, 4.7625))
            Line((6.57225, 4.7625), (6.57225, -4.7625))
        make_face()
        with Locations((14.2875, 0)):
            Circle(BODY_MOVE_COPY1_5_OUTLINE_R, mode=Mode.SUBTRACT)
    extrude(amount=BODY_MOVE_COPY1_5_DEPTH)

    # Body-Move_Copy1 6 outline → Body-Move_Copy1 6 (add)
    with BuildSketch(Plane(origin=(0, 0, 0), x_dir=(1, 0, 0), z_dir=(0, 1, 0))):
        with Locations((6.175375, 0)):
            Rectangle(BODY_MOVE_COPY1_6_OUTLINE_W, BODY_MOVE_COPY1_6_OUTLINE_H)
    extrude(amount=BODY_MOVE_COPY1_6_DEPTH)

    # Body-Move_Copy1 7 outline → Body-Move_Copy1 7 (add)
    with BuildSketch(Plane(origin=(0, 0, 0), x_dir=(1, 0, 0), z_dir=(0, 1, 0)).offset(BODY_MOVE_COPY1_START_6)):
        with Locations((6.175375, 0)):
            Rectangle(BODY_MOVE_COPY1_7_OUTLINE_W, BODY_MOVE_COPY1_7_OUTLINE_H)
    extrude(amount=BODY_MOVE_COPY1_7_DEPTH)

    # Body-Move_Copy1 8 outline → Body-Move_Copy1 8 (cut)
    with BuildSketch(Plane.XY.offset(BODY_MOVE_COPY1_START_7)):
        with BuildLine():
            ThreePointArc((6.57225, -2.83845), (7.037217985, -3.960982015), (8.15975, -4.42595))
            Line((8.15975, -4.42595), (21, -4.42595))
            Line((21, -4.42595), (21, -2.83845))
            Line((21, -2.83845), (6.57225, -2.83845))
        make_face()
        with BuildLine():
            ThreePointArc((5.778500001, 3.131039412), (6.370722749, 1.615042326), (6.57225, 0))
            Line((6.57225, 0), (6.57225, 5.7785))
            Line((6.57225, 5.7785), (5.7785, 5.7785))
            Line((5.7785, 5.7785), (5.778500001, 3.131039412))
        make_face()
        with BuildLine():
            Line((5.7785, -5.2197), (8.15975, -5.2197))
            ThreePointArc((8.15975, -5.2197), (6.475951977, -4.522248023), (5.7785, -2.83845))
            Line((5.7785, -2.83845), (5.7785, -5.2197))
        make_face()
        with BuildLine():
            Line((21, -6.7945), (21, -5.7785))
            Line((21, -5.7785), (5.7785, -5.7785))
            Line((5.7785, -5.7785), (5.7785, -5.793923765))
            ThreePointArc((5.7785, -5.793923765), (6.485017202, -5.988202793), (7.099014859, -6.3881))
            ThreePointArc((7.099014859, -6.3881), (7.591788734, -6.689422426), (8.15975, -6.7945))
            Line((8.15975, -6.7945), (21, -6.7945))
        make_face()
        with BuildLine():
            ThreePointArc((6.568647288, -6.97865), (6.200595269, -6.731343076), (5.7785, -6.595480694))
            Line((5.7785, -6.595480694), (5.7785, -7.028164125))
            Line((5.7785, -7.028164125), (6.57225, -7.028164125))
            Line((6.57225, -7.028164125), (6.57225, -7.58825))
            Line((6.57225, -7.58825), (8.15975, -7.58825))
            ThreePointArc((8.15975, -7.58825), (7.307808101, -7.430633639), (6.568647288, -6.97865))
        make_face()
    extrude(amount=BODY_MOVE_COPY1_8_DEPTH, mode=Mode.SUBTRACT)

    # Body-Move_Copy1 9 outline → Body-Move_Copy1 9 (add)
    with BuildSketch(Plane.XY.offset(BODY_MOVE_COPY1_START_7)):
        with BuildLine():
            Line((5.7785, 0), (5.778500001, 3.131039412))
            ThreePointArc((5.778500001, 3.131039412), (-5.646788638, 3.362773877), (0, -6.57225))
            Line((0, -6.57225), (5.507912147, -6.57225))
            ThreePointArc((5.507912147, -6.57225), (5.643703762, -6.578068336), (5.7785, -6.595480694))
            Line((5.7785, -6.595480694), (5.7785, -5.793923765))
            ThreePointArc((5.7785, -5.793923765), (5.643425688, -5.782359068), (5.507912147, -5.7785))
            Line((5.507912147, -5.7785), (0, -5.7785))
            ThreePointArc((0, -5.7785), (-4.086016535, 4.086016535), (5.7785, 0))
        make_face()
    extrude(amount=BODY_MOVE_COPY1_9_DEPTH)


with BuildPart() as body_2_1:
    add(body_2.part)

    # Combine1: cut body 3
    add(body_3.part, mode=Mode.SUBTRACT)

    # Sketch7 → Cut-Extrude4 (cut, two sides: drawn at the far end of the back side and taken through both)
    with BuildSketch(Plane.XY.offset(-CUT_EXTRUDE4_DEPTH_BACK)):
        with BuildLine():
            Line((5.7785, 0), (5.7785, -2.83845))
            Line((5.7785, -2.83845), (7.58825, -2.83845))
            Line((7.58825, -2.83845), (7.58825, 0))
            ThreePointArc((7.58825, 0), (-5.365703032, 5.365703032), (0, -7.58825))
            Line((0, -7.58825), (3.920412147, -7.58825))
            Line((3.920412147, -7.58825), (3.920412147, -5.7785))
            Line((3.920412147, -5.7785), (0, -5.7785))
            ThreePointArc((0, -5.7785), (-4.086016535, 4.086016535), (5.7785, 0))
        make_face()
    extrude(amount=CUT_EXTRUDE4_DEPTH + CUT_EXTRUDE4_DEPTH_BACK, mode=Mode.SUBTRACT)

    # Fillet1
    fillet1_edges = [body_2_1.edges().sort_by_distance(p)[0] for p in [
        (6.57225, -2.83845, -2.6035),
        (3.920412147, -6.57225, -2.6035),
        (7.58825, -2.83845, -3.1115),
        (3.920412147, -7.58825, -3.1115),
        (1.960206073, -6.57225, -0.4445),
        (-5.646788638, 3.362773877, -0.4445),
        (6.57225, -1.419225, -0.4445),
        (3.920412147, -7.08025, -0.4445),
        (3.920412147, -7.08025, 0.4445),
        (1.960206073, -7.58825, 0.4445),
        (1.960206073, -7.58825, -0.4445),
        (-5.365703032, 5.365703032, 0.4445),
        (-5.365703032, 5.365703032, -0.4445),
        (7.58825, -1.419225, 0.4445),
        (7.58825, -1.419225, -0.4445),
        (7.08025, -2.83845, 0.4445),
        (7.08025, -2.83845, -0.4445),
        (1.960206073, -6.57225, 0.4445),
        (-5.646788638, 3.362773877, 0.4445),
        (6.57225, -1.419225, 0.4445),
        (3.920412147, -4.7625, 0),
        (1.960206073, -4.7625, 5.7785),
        (3.920412147, -7.58825, 3.1115),
        (7.58825, -2.83845, 3.1115),
        (4.7625, -2.83845, 0),
        (3.920412147, -6.175375, 5.7785),
        (1.960206073, -7.58825, 5.7785),
        (-5.365703032, 5.365703032, 5.7785),
        (7.58825, -1.419225, 5.7785),
        (6.175375, -2.83845, 5.7785),
        (4.7625, -1.419225, 5.7785),
        (-3.367596045, 3.367596045, 5.7785),
        (4.7625, -1.419225, -5.7785),
        (6.175375, -2.83845, -5.7785),
        (7.58825, -1.419225, -5.7785),
        (-5.365703032, 5.365703032, -5.7785),
        (1.960206073, -7.58825, -5.7785),
        (3.920412147, -6.175375, -5.7785),
        (1.960206073, -4.7625, -5.7785),
        (-3.367596045, 3.367596045, -5.7785),
        (6.175375, -2.83845, -4.7625),
        (6.175375, -2.83845, 4.7625),
        (3.920412147, -5.7785, 0),
        (3.920412147, -6.57225, 2.6035),
        (1.960206073, -6.57225, -4.7625),
        (1.960206073, -5.7785, -4.7625),
        (1.960206073, -5.7785, 4.7625),
        (-4.086016535, 4.086016535, 4.7625),
        (5.7785, -1.419225, 4.7625),
        (6.57225, -1.419225, 4.7625),
        (-5.646788638, 3.362773877, 4.7625),
        (1.960206073, -6.57225, 4.7625),
        (3.920412147, -6.175375, 4.7625),
        (3.920412147, -6.175375, -4.7625),
        (5.7785, -2.83845, 0),
        (6.57225, -1.419225, -4.7625),
        (6.57225, -2.83845, 2.6035),
        (-5.646788638, 3.362773877, -4.7625),
        (-4.086016535, 4.086016535, -4.7625),
        (5.7785, -1.419225, -4.7625),
    ]]
    fillet(fillet1_edges, radius=FILLET1_R)


solid = Compound([part.part, body_2_1.part])
